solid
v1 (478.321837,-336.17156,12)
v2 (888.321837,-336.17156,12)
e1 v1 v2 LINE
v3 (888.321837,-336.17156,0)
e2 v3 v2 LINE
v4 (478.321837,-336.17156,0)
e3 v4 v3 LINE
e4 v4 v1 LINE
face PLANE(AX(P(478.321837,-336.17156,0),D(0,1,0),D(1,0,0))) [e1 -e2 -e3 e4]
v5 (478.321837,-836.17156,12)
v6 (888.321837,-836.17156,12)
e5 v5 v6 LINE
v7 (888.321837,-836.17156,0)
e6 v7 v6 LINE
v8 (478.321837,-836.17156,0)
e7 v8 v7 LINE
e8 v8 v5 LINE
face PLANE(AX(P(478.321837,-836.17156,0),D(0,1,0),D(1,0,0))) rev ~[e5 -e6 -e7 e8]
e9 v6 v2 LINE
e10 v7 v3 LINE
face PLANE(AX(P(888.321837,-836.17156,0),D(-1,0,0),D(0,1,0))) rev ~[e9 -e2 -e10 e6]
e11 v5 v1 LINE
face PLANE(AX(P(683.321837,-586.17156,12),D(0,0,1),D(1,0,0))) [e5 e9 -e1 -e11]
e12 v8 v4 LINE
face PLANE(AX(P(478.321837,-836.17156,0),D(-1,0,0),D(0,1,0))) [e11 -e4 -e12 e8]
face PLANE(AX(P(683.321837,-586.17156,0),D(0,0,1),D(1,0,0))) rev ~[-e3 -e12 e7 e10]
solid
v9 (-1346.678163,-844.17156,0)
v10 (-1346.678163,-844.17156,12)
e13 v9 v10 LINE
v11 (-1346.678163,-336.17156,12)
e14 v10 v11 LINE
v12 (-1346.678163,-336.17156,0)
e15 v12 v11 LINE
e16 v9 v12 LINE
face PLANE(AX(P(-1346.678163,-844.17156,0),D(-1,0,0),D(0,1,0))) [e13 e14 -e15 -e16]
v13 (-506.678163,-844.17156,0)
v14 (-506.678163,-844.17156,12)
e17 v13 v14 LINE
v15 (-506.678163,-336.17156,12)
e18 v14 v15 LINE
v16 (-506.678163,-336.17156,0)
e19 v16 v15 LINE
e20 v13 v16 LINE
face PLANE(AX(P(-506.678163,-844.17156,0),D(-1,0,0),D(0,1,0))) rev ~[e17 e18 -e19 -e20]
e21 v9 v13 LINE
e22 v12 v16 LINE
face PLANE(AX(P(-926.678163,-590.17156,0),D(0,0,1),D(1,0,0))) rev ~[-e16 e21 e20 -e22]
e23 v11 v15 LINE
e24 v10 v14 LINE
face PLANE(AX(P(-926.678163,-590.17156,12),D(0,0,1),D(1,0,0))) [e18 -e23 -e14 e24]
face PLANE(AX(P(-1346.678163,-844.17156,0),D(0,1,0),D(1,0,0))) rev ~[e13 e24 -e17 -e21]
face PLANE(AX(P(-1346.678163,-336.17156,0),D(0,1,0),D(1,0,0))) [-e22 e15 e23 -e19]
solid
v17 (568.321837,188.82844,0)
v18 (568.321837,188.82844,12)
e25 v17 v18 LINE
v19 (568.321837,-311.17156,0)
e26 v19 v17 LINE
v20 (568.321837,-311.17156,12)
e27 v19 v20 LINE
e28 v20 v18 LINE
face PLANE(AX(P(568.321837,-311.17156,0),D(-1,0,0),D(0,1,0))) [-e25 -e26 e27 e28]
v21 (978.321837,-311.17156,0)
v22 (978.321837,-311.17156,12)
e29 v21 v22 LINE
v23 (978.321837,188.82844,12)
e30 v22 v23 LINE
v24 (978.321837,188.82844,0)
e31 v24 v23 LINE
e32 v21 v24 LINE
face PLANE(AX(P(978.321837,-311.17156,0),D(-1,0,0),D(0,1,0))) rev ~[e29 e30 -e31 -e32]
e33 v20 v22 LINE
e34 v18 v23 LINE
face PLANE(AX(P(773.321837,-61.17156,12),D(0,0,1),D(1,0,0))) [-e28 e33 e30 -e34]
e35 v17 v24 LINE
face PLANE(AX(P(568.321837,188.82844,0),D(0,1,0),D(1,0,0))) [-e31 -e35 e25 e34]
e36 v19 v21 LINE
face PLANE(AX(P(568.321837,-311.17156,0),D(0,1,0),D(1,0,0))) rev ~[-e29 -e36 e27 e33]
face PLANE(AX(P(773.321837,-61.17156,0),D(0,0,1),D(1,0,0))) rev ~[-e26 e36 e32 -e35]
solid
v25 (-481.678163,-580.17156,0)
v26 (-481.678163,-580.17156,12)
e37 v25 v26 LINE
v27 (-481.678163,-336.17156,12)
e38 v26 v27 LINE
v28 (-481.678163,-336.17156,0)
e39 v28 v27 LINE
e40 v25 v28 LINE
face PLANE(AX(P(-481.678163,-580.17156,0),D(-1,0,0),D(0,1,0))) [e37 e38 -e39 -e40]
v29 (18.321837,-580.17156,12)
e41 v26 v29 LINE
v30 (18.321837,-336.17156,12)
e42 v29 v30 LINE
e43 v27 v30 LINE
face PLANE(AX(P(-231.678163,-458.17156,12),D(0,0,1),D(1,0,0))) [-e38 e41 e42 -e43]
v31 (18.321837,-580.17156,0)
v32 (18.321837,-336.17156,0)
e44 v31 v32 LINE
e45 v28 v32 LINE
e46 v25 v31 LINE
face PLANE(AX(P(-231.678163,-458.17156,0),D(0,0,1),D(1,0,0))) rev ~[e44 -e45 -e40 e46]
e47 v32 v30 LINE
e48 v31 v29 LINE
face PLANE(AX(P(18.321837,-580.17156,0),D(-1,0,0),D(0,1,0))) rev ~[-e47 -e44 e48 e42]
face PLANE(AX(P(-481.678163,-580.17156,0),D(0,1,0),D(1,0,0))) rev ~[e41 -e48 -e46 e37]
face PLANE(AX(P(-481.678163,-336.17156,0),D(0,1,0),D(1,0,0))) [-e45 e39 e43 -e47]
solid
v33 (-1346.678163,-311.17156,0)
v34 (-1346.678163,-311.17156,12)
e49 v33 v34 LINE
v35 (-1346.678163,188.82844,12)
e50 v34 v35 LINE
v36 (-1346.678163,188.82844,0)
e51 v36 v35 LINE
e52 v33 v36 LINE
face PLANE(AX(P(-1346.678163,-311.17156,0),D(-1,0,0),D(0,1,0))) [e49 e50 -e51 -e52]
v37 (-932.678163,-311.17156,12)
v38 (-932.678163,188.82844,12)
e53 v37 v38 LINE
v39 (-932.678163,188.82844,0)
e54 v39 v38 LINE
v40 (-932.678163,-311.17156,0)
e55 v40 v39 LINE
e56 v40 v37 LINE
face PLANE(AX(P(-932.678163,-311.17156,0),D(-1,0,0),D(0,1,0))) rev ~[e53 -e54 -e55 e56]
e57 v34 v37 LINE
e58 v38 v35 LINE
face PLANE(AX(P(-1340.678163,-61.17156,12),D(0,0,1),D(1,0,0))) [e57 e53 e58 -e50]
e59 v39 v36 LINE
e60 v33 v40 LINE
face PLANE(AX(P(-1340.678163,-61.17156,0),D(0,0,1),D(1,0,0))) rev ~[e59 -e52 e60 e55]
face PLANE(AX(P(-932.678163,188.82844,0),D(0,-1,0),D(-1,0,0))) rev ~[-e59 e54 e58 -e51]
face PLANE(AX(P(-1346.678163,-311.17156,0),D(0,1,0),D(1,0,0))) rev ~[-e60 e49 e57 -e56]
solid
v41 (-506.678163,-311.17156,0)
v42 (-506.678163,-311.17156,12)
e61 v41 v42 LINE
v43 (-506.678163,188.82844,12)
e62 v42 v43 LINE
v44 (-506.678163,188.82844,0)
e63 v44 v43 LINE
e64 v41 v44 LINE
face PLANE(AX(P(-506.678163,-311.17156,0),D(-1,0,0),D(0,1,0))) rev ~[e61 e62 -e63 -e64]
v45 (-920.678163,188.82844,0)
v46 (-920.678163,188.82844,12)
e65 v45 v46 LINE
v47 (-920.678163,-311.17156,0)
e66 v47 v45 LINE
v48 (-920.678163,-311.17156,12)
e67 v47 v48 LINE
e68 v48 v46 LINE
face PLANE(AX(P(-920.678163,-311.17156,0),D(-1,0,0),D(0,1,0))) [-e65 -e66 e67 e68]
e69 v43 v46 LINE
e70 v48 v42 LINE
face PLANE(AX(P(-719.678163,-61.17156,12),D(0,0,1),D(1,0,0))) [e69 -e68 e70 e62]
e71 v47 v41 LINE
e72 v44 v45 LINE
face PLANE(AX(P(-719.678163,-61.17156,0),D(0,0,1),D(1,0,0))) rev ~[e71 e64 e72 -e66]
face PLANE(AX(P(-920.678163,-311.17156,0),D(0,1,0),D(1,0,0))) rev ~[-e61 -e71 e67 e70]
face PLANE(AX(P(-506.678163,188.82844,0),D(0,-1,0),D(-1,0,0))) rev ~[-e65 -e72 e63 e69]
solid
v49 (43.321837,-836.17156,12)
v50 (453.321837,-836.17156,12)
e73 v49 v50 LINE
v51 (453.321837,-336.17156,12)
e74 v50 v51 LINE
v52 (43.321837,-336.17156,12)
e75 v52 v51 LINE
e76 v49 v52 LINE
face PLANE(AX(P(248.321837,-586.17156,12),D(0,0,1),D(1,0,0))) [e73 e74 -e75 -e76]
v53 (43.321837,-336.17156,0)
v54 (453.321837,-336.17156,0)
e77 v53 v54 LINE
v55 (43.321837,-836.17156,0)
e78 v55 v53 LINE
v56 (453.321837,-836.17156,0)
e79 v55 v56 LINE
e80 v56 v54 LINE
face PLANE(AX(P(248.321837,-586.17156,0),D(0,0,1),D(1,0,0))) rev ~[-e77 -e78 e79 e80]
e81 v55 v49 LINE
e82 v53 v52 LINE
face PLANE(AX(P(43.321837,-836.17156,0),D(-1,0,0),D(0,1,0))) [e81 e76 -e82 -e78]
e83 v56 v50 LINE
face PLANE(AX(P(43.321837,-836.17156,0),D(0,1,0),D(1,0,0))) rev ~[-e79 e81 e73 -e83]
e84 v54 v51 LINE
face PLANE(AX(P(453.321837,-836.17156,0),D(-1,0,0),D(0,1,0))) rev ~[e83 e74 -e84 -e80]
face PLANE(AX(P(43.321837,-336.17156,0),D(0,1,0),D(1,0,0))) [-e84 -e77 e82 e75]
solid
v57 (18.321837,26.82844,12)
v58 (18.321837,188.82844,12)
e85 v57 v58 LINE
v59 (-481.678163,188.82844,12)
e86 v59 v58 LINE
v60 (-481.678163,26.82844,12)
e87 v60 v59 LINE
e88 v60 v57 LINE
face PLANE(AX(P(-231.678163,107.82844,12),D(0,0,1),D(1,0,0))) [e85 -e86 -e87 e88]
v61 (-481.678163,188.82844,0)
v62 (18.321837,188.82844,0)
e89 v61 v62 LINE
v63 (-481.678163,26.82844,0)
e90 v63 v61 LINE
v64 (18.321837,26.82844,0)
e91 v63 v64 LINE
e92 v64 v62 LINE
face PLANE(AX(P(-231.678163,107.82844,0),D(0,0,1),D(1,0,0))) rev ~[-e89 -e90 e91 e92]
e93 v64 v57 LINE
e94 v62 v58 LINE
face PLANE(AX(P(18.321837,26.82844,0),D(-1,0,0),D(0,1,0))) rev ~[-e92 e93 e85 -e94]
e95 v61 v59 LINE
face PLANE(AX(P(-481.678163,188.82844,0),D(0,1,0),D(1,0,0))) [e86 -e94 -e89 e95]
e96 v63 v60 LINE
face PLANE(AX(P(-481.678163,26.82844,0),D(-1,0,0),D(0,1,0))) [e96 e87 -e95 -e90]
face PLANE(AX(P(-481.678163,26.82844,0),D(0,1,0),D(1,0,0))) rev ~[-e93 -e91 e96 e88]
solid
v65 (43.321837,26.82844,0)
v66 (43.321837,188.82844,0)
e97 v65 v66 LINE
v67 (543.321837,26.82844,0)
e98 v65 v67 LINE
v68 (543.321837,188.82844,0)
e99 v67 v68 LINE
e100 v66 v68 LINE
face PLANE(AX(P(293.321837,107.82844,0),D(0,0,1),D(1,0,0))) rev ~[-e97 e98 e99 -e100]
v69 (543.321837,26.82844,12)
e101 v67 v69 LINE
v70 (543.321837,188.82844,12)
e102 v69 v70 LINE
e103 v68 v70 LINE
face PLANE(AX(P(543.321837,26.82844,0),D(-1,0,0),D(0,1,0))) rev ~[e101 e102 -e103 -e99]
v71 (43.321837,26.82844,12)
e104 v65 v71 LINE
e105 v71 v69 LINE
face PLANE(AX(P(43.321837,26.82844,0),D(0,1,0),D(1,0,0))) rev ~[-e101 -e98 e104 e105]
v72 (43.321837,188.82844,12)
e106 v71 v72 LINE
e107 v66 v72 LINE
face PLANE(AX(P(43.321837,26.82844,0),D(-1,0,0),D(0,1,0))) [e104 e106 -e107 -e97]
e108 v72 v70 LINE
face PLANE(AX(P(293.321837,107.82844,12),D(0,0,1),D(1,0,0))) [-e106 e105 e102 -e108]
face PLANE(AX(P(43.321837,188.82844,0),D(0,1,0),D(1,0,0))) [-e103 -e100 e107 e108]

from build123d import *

# Parameters (mm, degrees)
F0_W     = 12
F0_H     = 500
F0_W_2   = 402
F1_DEPTH = 12
F0_W_3   = 840
F0_H_2   = 508
F0_W_4   = 500
F0_H_3   = 162
F0_H_4   = 244
F0_W_5   = 410


# Not quite as in the source:
# - a feature names something its author has since deleted; it is built from what else it names


with BuildPart() as f1:
    # F0 (on Top) → F1 (new body)
    with BuildSketch(Plane.XY):
        with Locations((-1340.6781625152, -61.1715600074)):
            Rectangle(F0_W, F0_H)
        with Locations((-1133.6781625152, -61.1715600074)):
            Rectangle(F0_W_2, F0_H)
    extrude(amount=F1_DEPTH)


with BuildPart() as f1b:
    # F0 (on Top) → F1, piece 2 (new body)
    with BuildSketch(Plane.XY):
        with Locations((-719.6781625152, -61.1715600074)):
            Rectangle(F0_W_2, F0_H)
        with Locations((-512.6781625152, -61.1715600074)):
            Rectangle(F0_W, F0_H)
    extrude(amount=F1_DEPTH)


with BuildPart() as f1c:
    # F0 (on Top) → F1, piece 3 (new body)
    with BuildSketch(Plane.XY):
        with Locations((-926.6781625152, -590.1715600074)):
            Rectangle(F0_W_3, F0_H_2)
    extrude(amount=F1_DEPTH)


with BuildPart() as f1d:
    # F0 (on Top) → F1, piece 4 (new body)
    with BuildSketch(Plane.XY):
        with Locations((-231.6781625152, 107.8284399926)):
            Rectangle(F0_W_4, F0_H_3)
    extrude(amount=F1_DEPTH)


with BuildPart() as f1e:
    # F0 (on Top) → F1, piece 5 (new body)
    with BuildSketch(Plane.XY):
        with Locations((-231.6781625152, -458.1715600074)):
            Rectangle(F0_W_4, F0_H_4)
    extrude(amount=F1_DEPTH)


with BuildPart() as f1f:
    # F0 (on Top) → F1, piece 6 (new body)
    with BuildSketch(Plane.XY):
        with Locations((248.3218374848, -586.1715600074)):
            Rectangle(F0_W_5, F0_H)
    extrude(amount=F1_DEPTH)


with BuildPart() as f1g:
    # F0 (on Top) → F1, piece 7 (new body)
    with BuildSketch(Plane.XY):
        with Locations((293.3218374848, 107.8284399926)):
            Rectangle(F0_W_4, F0_H_3)
    extrude(amount=F1_DEPTH)


with BuildPart() as f1h:
    # F0 (on Top) → F1, piece 8 (new body)
    with BuildSketch(Plane.XY):
        with Locations((683.3218374848, -586.1715600074)):
            Rectangle(F0_W_5, F0_H)
    extrude(amount=F1_DEPTH)


with BuildPart() as f1i:
    # F0 (on Top) → F1, piece 9 (new body)
    with BuildSketch(Plane.XY):
        with Locations((773.3218374848, -61.1715600074)):
            Rectangle(F0_W_5, F0_H)
    extrude(amount=F1_DEPTH)


solid = Compound([f1.part, f1b.part, f1c.part, f1d.part, f1e.part, f1f.part, f1g.part, f1h.part, f1i.part])
